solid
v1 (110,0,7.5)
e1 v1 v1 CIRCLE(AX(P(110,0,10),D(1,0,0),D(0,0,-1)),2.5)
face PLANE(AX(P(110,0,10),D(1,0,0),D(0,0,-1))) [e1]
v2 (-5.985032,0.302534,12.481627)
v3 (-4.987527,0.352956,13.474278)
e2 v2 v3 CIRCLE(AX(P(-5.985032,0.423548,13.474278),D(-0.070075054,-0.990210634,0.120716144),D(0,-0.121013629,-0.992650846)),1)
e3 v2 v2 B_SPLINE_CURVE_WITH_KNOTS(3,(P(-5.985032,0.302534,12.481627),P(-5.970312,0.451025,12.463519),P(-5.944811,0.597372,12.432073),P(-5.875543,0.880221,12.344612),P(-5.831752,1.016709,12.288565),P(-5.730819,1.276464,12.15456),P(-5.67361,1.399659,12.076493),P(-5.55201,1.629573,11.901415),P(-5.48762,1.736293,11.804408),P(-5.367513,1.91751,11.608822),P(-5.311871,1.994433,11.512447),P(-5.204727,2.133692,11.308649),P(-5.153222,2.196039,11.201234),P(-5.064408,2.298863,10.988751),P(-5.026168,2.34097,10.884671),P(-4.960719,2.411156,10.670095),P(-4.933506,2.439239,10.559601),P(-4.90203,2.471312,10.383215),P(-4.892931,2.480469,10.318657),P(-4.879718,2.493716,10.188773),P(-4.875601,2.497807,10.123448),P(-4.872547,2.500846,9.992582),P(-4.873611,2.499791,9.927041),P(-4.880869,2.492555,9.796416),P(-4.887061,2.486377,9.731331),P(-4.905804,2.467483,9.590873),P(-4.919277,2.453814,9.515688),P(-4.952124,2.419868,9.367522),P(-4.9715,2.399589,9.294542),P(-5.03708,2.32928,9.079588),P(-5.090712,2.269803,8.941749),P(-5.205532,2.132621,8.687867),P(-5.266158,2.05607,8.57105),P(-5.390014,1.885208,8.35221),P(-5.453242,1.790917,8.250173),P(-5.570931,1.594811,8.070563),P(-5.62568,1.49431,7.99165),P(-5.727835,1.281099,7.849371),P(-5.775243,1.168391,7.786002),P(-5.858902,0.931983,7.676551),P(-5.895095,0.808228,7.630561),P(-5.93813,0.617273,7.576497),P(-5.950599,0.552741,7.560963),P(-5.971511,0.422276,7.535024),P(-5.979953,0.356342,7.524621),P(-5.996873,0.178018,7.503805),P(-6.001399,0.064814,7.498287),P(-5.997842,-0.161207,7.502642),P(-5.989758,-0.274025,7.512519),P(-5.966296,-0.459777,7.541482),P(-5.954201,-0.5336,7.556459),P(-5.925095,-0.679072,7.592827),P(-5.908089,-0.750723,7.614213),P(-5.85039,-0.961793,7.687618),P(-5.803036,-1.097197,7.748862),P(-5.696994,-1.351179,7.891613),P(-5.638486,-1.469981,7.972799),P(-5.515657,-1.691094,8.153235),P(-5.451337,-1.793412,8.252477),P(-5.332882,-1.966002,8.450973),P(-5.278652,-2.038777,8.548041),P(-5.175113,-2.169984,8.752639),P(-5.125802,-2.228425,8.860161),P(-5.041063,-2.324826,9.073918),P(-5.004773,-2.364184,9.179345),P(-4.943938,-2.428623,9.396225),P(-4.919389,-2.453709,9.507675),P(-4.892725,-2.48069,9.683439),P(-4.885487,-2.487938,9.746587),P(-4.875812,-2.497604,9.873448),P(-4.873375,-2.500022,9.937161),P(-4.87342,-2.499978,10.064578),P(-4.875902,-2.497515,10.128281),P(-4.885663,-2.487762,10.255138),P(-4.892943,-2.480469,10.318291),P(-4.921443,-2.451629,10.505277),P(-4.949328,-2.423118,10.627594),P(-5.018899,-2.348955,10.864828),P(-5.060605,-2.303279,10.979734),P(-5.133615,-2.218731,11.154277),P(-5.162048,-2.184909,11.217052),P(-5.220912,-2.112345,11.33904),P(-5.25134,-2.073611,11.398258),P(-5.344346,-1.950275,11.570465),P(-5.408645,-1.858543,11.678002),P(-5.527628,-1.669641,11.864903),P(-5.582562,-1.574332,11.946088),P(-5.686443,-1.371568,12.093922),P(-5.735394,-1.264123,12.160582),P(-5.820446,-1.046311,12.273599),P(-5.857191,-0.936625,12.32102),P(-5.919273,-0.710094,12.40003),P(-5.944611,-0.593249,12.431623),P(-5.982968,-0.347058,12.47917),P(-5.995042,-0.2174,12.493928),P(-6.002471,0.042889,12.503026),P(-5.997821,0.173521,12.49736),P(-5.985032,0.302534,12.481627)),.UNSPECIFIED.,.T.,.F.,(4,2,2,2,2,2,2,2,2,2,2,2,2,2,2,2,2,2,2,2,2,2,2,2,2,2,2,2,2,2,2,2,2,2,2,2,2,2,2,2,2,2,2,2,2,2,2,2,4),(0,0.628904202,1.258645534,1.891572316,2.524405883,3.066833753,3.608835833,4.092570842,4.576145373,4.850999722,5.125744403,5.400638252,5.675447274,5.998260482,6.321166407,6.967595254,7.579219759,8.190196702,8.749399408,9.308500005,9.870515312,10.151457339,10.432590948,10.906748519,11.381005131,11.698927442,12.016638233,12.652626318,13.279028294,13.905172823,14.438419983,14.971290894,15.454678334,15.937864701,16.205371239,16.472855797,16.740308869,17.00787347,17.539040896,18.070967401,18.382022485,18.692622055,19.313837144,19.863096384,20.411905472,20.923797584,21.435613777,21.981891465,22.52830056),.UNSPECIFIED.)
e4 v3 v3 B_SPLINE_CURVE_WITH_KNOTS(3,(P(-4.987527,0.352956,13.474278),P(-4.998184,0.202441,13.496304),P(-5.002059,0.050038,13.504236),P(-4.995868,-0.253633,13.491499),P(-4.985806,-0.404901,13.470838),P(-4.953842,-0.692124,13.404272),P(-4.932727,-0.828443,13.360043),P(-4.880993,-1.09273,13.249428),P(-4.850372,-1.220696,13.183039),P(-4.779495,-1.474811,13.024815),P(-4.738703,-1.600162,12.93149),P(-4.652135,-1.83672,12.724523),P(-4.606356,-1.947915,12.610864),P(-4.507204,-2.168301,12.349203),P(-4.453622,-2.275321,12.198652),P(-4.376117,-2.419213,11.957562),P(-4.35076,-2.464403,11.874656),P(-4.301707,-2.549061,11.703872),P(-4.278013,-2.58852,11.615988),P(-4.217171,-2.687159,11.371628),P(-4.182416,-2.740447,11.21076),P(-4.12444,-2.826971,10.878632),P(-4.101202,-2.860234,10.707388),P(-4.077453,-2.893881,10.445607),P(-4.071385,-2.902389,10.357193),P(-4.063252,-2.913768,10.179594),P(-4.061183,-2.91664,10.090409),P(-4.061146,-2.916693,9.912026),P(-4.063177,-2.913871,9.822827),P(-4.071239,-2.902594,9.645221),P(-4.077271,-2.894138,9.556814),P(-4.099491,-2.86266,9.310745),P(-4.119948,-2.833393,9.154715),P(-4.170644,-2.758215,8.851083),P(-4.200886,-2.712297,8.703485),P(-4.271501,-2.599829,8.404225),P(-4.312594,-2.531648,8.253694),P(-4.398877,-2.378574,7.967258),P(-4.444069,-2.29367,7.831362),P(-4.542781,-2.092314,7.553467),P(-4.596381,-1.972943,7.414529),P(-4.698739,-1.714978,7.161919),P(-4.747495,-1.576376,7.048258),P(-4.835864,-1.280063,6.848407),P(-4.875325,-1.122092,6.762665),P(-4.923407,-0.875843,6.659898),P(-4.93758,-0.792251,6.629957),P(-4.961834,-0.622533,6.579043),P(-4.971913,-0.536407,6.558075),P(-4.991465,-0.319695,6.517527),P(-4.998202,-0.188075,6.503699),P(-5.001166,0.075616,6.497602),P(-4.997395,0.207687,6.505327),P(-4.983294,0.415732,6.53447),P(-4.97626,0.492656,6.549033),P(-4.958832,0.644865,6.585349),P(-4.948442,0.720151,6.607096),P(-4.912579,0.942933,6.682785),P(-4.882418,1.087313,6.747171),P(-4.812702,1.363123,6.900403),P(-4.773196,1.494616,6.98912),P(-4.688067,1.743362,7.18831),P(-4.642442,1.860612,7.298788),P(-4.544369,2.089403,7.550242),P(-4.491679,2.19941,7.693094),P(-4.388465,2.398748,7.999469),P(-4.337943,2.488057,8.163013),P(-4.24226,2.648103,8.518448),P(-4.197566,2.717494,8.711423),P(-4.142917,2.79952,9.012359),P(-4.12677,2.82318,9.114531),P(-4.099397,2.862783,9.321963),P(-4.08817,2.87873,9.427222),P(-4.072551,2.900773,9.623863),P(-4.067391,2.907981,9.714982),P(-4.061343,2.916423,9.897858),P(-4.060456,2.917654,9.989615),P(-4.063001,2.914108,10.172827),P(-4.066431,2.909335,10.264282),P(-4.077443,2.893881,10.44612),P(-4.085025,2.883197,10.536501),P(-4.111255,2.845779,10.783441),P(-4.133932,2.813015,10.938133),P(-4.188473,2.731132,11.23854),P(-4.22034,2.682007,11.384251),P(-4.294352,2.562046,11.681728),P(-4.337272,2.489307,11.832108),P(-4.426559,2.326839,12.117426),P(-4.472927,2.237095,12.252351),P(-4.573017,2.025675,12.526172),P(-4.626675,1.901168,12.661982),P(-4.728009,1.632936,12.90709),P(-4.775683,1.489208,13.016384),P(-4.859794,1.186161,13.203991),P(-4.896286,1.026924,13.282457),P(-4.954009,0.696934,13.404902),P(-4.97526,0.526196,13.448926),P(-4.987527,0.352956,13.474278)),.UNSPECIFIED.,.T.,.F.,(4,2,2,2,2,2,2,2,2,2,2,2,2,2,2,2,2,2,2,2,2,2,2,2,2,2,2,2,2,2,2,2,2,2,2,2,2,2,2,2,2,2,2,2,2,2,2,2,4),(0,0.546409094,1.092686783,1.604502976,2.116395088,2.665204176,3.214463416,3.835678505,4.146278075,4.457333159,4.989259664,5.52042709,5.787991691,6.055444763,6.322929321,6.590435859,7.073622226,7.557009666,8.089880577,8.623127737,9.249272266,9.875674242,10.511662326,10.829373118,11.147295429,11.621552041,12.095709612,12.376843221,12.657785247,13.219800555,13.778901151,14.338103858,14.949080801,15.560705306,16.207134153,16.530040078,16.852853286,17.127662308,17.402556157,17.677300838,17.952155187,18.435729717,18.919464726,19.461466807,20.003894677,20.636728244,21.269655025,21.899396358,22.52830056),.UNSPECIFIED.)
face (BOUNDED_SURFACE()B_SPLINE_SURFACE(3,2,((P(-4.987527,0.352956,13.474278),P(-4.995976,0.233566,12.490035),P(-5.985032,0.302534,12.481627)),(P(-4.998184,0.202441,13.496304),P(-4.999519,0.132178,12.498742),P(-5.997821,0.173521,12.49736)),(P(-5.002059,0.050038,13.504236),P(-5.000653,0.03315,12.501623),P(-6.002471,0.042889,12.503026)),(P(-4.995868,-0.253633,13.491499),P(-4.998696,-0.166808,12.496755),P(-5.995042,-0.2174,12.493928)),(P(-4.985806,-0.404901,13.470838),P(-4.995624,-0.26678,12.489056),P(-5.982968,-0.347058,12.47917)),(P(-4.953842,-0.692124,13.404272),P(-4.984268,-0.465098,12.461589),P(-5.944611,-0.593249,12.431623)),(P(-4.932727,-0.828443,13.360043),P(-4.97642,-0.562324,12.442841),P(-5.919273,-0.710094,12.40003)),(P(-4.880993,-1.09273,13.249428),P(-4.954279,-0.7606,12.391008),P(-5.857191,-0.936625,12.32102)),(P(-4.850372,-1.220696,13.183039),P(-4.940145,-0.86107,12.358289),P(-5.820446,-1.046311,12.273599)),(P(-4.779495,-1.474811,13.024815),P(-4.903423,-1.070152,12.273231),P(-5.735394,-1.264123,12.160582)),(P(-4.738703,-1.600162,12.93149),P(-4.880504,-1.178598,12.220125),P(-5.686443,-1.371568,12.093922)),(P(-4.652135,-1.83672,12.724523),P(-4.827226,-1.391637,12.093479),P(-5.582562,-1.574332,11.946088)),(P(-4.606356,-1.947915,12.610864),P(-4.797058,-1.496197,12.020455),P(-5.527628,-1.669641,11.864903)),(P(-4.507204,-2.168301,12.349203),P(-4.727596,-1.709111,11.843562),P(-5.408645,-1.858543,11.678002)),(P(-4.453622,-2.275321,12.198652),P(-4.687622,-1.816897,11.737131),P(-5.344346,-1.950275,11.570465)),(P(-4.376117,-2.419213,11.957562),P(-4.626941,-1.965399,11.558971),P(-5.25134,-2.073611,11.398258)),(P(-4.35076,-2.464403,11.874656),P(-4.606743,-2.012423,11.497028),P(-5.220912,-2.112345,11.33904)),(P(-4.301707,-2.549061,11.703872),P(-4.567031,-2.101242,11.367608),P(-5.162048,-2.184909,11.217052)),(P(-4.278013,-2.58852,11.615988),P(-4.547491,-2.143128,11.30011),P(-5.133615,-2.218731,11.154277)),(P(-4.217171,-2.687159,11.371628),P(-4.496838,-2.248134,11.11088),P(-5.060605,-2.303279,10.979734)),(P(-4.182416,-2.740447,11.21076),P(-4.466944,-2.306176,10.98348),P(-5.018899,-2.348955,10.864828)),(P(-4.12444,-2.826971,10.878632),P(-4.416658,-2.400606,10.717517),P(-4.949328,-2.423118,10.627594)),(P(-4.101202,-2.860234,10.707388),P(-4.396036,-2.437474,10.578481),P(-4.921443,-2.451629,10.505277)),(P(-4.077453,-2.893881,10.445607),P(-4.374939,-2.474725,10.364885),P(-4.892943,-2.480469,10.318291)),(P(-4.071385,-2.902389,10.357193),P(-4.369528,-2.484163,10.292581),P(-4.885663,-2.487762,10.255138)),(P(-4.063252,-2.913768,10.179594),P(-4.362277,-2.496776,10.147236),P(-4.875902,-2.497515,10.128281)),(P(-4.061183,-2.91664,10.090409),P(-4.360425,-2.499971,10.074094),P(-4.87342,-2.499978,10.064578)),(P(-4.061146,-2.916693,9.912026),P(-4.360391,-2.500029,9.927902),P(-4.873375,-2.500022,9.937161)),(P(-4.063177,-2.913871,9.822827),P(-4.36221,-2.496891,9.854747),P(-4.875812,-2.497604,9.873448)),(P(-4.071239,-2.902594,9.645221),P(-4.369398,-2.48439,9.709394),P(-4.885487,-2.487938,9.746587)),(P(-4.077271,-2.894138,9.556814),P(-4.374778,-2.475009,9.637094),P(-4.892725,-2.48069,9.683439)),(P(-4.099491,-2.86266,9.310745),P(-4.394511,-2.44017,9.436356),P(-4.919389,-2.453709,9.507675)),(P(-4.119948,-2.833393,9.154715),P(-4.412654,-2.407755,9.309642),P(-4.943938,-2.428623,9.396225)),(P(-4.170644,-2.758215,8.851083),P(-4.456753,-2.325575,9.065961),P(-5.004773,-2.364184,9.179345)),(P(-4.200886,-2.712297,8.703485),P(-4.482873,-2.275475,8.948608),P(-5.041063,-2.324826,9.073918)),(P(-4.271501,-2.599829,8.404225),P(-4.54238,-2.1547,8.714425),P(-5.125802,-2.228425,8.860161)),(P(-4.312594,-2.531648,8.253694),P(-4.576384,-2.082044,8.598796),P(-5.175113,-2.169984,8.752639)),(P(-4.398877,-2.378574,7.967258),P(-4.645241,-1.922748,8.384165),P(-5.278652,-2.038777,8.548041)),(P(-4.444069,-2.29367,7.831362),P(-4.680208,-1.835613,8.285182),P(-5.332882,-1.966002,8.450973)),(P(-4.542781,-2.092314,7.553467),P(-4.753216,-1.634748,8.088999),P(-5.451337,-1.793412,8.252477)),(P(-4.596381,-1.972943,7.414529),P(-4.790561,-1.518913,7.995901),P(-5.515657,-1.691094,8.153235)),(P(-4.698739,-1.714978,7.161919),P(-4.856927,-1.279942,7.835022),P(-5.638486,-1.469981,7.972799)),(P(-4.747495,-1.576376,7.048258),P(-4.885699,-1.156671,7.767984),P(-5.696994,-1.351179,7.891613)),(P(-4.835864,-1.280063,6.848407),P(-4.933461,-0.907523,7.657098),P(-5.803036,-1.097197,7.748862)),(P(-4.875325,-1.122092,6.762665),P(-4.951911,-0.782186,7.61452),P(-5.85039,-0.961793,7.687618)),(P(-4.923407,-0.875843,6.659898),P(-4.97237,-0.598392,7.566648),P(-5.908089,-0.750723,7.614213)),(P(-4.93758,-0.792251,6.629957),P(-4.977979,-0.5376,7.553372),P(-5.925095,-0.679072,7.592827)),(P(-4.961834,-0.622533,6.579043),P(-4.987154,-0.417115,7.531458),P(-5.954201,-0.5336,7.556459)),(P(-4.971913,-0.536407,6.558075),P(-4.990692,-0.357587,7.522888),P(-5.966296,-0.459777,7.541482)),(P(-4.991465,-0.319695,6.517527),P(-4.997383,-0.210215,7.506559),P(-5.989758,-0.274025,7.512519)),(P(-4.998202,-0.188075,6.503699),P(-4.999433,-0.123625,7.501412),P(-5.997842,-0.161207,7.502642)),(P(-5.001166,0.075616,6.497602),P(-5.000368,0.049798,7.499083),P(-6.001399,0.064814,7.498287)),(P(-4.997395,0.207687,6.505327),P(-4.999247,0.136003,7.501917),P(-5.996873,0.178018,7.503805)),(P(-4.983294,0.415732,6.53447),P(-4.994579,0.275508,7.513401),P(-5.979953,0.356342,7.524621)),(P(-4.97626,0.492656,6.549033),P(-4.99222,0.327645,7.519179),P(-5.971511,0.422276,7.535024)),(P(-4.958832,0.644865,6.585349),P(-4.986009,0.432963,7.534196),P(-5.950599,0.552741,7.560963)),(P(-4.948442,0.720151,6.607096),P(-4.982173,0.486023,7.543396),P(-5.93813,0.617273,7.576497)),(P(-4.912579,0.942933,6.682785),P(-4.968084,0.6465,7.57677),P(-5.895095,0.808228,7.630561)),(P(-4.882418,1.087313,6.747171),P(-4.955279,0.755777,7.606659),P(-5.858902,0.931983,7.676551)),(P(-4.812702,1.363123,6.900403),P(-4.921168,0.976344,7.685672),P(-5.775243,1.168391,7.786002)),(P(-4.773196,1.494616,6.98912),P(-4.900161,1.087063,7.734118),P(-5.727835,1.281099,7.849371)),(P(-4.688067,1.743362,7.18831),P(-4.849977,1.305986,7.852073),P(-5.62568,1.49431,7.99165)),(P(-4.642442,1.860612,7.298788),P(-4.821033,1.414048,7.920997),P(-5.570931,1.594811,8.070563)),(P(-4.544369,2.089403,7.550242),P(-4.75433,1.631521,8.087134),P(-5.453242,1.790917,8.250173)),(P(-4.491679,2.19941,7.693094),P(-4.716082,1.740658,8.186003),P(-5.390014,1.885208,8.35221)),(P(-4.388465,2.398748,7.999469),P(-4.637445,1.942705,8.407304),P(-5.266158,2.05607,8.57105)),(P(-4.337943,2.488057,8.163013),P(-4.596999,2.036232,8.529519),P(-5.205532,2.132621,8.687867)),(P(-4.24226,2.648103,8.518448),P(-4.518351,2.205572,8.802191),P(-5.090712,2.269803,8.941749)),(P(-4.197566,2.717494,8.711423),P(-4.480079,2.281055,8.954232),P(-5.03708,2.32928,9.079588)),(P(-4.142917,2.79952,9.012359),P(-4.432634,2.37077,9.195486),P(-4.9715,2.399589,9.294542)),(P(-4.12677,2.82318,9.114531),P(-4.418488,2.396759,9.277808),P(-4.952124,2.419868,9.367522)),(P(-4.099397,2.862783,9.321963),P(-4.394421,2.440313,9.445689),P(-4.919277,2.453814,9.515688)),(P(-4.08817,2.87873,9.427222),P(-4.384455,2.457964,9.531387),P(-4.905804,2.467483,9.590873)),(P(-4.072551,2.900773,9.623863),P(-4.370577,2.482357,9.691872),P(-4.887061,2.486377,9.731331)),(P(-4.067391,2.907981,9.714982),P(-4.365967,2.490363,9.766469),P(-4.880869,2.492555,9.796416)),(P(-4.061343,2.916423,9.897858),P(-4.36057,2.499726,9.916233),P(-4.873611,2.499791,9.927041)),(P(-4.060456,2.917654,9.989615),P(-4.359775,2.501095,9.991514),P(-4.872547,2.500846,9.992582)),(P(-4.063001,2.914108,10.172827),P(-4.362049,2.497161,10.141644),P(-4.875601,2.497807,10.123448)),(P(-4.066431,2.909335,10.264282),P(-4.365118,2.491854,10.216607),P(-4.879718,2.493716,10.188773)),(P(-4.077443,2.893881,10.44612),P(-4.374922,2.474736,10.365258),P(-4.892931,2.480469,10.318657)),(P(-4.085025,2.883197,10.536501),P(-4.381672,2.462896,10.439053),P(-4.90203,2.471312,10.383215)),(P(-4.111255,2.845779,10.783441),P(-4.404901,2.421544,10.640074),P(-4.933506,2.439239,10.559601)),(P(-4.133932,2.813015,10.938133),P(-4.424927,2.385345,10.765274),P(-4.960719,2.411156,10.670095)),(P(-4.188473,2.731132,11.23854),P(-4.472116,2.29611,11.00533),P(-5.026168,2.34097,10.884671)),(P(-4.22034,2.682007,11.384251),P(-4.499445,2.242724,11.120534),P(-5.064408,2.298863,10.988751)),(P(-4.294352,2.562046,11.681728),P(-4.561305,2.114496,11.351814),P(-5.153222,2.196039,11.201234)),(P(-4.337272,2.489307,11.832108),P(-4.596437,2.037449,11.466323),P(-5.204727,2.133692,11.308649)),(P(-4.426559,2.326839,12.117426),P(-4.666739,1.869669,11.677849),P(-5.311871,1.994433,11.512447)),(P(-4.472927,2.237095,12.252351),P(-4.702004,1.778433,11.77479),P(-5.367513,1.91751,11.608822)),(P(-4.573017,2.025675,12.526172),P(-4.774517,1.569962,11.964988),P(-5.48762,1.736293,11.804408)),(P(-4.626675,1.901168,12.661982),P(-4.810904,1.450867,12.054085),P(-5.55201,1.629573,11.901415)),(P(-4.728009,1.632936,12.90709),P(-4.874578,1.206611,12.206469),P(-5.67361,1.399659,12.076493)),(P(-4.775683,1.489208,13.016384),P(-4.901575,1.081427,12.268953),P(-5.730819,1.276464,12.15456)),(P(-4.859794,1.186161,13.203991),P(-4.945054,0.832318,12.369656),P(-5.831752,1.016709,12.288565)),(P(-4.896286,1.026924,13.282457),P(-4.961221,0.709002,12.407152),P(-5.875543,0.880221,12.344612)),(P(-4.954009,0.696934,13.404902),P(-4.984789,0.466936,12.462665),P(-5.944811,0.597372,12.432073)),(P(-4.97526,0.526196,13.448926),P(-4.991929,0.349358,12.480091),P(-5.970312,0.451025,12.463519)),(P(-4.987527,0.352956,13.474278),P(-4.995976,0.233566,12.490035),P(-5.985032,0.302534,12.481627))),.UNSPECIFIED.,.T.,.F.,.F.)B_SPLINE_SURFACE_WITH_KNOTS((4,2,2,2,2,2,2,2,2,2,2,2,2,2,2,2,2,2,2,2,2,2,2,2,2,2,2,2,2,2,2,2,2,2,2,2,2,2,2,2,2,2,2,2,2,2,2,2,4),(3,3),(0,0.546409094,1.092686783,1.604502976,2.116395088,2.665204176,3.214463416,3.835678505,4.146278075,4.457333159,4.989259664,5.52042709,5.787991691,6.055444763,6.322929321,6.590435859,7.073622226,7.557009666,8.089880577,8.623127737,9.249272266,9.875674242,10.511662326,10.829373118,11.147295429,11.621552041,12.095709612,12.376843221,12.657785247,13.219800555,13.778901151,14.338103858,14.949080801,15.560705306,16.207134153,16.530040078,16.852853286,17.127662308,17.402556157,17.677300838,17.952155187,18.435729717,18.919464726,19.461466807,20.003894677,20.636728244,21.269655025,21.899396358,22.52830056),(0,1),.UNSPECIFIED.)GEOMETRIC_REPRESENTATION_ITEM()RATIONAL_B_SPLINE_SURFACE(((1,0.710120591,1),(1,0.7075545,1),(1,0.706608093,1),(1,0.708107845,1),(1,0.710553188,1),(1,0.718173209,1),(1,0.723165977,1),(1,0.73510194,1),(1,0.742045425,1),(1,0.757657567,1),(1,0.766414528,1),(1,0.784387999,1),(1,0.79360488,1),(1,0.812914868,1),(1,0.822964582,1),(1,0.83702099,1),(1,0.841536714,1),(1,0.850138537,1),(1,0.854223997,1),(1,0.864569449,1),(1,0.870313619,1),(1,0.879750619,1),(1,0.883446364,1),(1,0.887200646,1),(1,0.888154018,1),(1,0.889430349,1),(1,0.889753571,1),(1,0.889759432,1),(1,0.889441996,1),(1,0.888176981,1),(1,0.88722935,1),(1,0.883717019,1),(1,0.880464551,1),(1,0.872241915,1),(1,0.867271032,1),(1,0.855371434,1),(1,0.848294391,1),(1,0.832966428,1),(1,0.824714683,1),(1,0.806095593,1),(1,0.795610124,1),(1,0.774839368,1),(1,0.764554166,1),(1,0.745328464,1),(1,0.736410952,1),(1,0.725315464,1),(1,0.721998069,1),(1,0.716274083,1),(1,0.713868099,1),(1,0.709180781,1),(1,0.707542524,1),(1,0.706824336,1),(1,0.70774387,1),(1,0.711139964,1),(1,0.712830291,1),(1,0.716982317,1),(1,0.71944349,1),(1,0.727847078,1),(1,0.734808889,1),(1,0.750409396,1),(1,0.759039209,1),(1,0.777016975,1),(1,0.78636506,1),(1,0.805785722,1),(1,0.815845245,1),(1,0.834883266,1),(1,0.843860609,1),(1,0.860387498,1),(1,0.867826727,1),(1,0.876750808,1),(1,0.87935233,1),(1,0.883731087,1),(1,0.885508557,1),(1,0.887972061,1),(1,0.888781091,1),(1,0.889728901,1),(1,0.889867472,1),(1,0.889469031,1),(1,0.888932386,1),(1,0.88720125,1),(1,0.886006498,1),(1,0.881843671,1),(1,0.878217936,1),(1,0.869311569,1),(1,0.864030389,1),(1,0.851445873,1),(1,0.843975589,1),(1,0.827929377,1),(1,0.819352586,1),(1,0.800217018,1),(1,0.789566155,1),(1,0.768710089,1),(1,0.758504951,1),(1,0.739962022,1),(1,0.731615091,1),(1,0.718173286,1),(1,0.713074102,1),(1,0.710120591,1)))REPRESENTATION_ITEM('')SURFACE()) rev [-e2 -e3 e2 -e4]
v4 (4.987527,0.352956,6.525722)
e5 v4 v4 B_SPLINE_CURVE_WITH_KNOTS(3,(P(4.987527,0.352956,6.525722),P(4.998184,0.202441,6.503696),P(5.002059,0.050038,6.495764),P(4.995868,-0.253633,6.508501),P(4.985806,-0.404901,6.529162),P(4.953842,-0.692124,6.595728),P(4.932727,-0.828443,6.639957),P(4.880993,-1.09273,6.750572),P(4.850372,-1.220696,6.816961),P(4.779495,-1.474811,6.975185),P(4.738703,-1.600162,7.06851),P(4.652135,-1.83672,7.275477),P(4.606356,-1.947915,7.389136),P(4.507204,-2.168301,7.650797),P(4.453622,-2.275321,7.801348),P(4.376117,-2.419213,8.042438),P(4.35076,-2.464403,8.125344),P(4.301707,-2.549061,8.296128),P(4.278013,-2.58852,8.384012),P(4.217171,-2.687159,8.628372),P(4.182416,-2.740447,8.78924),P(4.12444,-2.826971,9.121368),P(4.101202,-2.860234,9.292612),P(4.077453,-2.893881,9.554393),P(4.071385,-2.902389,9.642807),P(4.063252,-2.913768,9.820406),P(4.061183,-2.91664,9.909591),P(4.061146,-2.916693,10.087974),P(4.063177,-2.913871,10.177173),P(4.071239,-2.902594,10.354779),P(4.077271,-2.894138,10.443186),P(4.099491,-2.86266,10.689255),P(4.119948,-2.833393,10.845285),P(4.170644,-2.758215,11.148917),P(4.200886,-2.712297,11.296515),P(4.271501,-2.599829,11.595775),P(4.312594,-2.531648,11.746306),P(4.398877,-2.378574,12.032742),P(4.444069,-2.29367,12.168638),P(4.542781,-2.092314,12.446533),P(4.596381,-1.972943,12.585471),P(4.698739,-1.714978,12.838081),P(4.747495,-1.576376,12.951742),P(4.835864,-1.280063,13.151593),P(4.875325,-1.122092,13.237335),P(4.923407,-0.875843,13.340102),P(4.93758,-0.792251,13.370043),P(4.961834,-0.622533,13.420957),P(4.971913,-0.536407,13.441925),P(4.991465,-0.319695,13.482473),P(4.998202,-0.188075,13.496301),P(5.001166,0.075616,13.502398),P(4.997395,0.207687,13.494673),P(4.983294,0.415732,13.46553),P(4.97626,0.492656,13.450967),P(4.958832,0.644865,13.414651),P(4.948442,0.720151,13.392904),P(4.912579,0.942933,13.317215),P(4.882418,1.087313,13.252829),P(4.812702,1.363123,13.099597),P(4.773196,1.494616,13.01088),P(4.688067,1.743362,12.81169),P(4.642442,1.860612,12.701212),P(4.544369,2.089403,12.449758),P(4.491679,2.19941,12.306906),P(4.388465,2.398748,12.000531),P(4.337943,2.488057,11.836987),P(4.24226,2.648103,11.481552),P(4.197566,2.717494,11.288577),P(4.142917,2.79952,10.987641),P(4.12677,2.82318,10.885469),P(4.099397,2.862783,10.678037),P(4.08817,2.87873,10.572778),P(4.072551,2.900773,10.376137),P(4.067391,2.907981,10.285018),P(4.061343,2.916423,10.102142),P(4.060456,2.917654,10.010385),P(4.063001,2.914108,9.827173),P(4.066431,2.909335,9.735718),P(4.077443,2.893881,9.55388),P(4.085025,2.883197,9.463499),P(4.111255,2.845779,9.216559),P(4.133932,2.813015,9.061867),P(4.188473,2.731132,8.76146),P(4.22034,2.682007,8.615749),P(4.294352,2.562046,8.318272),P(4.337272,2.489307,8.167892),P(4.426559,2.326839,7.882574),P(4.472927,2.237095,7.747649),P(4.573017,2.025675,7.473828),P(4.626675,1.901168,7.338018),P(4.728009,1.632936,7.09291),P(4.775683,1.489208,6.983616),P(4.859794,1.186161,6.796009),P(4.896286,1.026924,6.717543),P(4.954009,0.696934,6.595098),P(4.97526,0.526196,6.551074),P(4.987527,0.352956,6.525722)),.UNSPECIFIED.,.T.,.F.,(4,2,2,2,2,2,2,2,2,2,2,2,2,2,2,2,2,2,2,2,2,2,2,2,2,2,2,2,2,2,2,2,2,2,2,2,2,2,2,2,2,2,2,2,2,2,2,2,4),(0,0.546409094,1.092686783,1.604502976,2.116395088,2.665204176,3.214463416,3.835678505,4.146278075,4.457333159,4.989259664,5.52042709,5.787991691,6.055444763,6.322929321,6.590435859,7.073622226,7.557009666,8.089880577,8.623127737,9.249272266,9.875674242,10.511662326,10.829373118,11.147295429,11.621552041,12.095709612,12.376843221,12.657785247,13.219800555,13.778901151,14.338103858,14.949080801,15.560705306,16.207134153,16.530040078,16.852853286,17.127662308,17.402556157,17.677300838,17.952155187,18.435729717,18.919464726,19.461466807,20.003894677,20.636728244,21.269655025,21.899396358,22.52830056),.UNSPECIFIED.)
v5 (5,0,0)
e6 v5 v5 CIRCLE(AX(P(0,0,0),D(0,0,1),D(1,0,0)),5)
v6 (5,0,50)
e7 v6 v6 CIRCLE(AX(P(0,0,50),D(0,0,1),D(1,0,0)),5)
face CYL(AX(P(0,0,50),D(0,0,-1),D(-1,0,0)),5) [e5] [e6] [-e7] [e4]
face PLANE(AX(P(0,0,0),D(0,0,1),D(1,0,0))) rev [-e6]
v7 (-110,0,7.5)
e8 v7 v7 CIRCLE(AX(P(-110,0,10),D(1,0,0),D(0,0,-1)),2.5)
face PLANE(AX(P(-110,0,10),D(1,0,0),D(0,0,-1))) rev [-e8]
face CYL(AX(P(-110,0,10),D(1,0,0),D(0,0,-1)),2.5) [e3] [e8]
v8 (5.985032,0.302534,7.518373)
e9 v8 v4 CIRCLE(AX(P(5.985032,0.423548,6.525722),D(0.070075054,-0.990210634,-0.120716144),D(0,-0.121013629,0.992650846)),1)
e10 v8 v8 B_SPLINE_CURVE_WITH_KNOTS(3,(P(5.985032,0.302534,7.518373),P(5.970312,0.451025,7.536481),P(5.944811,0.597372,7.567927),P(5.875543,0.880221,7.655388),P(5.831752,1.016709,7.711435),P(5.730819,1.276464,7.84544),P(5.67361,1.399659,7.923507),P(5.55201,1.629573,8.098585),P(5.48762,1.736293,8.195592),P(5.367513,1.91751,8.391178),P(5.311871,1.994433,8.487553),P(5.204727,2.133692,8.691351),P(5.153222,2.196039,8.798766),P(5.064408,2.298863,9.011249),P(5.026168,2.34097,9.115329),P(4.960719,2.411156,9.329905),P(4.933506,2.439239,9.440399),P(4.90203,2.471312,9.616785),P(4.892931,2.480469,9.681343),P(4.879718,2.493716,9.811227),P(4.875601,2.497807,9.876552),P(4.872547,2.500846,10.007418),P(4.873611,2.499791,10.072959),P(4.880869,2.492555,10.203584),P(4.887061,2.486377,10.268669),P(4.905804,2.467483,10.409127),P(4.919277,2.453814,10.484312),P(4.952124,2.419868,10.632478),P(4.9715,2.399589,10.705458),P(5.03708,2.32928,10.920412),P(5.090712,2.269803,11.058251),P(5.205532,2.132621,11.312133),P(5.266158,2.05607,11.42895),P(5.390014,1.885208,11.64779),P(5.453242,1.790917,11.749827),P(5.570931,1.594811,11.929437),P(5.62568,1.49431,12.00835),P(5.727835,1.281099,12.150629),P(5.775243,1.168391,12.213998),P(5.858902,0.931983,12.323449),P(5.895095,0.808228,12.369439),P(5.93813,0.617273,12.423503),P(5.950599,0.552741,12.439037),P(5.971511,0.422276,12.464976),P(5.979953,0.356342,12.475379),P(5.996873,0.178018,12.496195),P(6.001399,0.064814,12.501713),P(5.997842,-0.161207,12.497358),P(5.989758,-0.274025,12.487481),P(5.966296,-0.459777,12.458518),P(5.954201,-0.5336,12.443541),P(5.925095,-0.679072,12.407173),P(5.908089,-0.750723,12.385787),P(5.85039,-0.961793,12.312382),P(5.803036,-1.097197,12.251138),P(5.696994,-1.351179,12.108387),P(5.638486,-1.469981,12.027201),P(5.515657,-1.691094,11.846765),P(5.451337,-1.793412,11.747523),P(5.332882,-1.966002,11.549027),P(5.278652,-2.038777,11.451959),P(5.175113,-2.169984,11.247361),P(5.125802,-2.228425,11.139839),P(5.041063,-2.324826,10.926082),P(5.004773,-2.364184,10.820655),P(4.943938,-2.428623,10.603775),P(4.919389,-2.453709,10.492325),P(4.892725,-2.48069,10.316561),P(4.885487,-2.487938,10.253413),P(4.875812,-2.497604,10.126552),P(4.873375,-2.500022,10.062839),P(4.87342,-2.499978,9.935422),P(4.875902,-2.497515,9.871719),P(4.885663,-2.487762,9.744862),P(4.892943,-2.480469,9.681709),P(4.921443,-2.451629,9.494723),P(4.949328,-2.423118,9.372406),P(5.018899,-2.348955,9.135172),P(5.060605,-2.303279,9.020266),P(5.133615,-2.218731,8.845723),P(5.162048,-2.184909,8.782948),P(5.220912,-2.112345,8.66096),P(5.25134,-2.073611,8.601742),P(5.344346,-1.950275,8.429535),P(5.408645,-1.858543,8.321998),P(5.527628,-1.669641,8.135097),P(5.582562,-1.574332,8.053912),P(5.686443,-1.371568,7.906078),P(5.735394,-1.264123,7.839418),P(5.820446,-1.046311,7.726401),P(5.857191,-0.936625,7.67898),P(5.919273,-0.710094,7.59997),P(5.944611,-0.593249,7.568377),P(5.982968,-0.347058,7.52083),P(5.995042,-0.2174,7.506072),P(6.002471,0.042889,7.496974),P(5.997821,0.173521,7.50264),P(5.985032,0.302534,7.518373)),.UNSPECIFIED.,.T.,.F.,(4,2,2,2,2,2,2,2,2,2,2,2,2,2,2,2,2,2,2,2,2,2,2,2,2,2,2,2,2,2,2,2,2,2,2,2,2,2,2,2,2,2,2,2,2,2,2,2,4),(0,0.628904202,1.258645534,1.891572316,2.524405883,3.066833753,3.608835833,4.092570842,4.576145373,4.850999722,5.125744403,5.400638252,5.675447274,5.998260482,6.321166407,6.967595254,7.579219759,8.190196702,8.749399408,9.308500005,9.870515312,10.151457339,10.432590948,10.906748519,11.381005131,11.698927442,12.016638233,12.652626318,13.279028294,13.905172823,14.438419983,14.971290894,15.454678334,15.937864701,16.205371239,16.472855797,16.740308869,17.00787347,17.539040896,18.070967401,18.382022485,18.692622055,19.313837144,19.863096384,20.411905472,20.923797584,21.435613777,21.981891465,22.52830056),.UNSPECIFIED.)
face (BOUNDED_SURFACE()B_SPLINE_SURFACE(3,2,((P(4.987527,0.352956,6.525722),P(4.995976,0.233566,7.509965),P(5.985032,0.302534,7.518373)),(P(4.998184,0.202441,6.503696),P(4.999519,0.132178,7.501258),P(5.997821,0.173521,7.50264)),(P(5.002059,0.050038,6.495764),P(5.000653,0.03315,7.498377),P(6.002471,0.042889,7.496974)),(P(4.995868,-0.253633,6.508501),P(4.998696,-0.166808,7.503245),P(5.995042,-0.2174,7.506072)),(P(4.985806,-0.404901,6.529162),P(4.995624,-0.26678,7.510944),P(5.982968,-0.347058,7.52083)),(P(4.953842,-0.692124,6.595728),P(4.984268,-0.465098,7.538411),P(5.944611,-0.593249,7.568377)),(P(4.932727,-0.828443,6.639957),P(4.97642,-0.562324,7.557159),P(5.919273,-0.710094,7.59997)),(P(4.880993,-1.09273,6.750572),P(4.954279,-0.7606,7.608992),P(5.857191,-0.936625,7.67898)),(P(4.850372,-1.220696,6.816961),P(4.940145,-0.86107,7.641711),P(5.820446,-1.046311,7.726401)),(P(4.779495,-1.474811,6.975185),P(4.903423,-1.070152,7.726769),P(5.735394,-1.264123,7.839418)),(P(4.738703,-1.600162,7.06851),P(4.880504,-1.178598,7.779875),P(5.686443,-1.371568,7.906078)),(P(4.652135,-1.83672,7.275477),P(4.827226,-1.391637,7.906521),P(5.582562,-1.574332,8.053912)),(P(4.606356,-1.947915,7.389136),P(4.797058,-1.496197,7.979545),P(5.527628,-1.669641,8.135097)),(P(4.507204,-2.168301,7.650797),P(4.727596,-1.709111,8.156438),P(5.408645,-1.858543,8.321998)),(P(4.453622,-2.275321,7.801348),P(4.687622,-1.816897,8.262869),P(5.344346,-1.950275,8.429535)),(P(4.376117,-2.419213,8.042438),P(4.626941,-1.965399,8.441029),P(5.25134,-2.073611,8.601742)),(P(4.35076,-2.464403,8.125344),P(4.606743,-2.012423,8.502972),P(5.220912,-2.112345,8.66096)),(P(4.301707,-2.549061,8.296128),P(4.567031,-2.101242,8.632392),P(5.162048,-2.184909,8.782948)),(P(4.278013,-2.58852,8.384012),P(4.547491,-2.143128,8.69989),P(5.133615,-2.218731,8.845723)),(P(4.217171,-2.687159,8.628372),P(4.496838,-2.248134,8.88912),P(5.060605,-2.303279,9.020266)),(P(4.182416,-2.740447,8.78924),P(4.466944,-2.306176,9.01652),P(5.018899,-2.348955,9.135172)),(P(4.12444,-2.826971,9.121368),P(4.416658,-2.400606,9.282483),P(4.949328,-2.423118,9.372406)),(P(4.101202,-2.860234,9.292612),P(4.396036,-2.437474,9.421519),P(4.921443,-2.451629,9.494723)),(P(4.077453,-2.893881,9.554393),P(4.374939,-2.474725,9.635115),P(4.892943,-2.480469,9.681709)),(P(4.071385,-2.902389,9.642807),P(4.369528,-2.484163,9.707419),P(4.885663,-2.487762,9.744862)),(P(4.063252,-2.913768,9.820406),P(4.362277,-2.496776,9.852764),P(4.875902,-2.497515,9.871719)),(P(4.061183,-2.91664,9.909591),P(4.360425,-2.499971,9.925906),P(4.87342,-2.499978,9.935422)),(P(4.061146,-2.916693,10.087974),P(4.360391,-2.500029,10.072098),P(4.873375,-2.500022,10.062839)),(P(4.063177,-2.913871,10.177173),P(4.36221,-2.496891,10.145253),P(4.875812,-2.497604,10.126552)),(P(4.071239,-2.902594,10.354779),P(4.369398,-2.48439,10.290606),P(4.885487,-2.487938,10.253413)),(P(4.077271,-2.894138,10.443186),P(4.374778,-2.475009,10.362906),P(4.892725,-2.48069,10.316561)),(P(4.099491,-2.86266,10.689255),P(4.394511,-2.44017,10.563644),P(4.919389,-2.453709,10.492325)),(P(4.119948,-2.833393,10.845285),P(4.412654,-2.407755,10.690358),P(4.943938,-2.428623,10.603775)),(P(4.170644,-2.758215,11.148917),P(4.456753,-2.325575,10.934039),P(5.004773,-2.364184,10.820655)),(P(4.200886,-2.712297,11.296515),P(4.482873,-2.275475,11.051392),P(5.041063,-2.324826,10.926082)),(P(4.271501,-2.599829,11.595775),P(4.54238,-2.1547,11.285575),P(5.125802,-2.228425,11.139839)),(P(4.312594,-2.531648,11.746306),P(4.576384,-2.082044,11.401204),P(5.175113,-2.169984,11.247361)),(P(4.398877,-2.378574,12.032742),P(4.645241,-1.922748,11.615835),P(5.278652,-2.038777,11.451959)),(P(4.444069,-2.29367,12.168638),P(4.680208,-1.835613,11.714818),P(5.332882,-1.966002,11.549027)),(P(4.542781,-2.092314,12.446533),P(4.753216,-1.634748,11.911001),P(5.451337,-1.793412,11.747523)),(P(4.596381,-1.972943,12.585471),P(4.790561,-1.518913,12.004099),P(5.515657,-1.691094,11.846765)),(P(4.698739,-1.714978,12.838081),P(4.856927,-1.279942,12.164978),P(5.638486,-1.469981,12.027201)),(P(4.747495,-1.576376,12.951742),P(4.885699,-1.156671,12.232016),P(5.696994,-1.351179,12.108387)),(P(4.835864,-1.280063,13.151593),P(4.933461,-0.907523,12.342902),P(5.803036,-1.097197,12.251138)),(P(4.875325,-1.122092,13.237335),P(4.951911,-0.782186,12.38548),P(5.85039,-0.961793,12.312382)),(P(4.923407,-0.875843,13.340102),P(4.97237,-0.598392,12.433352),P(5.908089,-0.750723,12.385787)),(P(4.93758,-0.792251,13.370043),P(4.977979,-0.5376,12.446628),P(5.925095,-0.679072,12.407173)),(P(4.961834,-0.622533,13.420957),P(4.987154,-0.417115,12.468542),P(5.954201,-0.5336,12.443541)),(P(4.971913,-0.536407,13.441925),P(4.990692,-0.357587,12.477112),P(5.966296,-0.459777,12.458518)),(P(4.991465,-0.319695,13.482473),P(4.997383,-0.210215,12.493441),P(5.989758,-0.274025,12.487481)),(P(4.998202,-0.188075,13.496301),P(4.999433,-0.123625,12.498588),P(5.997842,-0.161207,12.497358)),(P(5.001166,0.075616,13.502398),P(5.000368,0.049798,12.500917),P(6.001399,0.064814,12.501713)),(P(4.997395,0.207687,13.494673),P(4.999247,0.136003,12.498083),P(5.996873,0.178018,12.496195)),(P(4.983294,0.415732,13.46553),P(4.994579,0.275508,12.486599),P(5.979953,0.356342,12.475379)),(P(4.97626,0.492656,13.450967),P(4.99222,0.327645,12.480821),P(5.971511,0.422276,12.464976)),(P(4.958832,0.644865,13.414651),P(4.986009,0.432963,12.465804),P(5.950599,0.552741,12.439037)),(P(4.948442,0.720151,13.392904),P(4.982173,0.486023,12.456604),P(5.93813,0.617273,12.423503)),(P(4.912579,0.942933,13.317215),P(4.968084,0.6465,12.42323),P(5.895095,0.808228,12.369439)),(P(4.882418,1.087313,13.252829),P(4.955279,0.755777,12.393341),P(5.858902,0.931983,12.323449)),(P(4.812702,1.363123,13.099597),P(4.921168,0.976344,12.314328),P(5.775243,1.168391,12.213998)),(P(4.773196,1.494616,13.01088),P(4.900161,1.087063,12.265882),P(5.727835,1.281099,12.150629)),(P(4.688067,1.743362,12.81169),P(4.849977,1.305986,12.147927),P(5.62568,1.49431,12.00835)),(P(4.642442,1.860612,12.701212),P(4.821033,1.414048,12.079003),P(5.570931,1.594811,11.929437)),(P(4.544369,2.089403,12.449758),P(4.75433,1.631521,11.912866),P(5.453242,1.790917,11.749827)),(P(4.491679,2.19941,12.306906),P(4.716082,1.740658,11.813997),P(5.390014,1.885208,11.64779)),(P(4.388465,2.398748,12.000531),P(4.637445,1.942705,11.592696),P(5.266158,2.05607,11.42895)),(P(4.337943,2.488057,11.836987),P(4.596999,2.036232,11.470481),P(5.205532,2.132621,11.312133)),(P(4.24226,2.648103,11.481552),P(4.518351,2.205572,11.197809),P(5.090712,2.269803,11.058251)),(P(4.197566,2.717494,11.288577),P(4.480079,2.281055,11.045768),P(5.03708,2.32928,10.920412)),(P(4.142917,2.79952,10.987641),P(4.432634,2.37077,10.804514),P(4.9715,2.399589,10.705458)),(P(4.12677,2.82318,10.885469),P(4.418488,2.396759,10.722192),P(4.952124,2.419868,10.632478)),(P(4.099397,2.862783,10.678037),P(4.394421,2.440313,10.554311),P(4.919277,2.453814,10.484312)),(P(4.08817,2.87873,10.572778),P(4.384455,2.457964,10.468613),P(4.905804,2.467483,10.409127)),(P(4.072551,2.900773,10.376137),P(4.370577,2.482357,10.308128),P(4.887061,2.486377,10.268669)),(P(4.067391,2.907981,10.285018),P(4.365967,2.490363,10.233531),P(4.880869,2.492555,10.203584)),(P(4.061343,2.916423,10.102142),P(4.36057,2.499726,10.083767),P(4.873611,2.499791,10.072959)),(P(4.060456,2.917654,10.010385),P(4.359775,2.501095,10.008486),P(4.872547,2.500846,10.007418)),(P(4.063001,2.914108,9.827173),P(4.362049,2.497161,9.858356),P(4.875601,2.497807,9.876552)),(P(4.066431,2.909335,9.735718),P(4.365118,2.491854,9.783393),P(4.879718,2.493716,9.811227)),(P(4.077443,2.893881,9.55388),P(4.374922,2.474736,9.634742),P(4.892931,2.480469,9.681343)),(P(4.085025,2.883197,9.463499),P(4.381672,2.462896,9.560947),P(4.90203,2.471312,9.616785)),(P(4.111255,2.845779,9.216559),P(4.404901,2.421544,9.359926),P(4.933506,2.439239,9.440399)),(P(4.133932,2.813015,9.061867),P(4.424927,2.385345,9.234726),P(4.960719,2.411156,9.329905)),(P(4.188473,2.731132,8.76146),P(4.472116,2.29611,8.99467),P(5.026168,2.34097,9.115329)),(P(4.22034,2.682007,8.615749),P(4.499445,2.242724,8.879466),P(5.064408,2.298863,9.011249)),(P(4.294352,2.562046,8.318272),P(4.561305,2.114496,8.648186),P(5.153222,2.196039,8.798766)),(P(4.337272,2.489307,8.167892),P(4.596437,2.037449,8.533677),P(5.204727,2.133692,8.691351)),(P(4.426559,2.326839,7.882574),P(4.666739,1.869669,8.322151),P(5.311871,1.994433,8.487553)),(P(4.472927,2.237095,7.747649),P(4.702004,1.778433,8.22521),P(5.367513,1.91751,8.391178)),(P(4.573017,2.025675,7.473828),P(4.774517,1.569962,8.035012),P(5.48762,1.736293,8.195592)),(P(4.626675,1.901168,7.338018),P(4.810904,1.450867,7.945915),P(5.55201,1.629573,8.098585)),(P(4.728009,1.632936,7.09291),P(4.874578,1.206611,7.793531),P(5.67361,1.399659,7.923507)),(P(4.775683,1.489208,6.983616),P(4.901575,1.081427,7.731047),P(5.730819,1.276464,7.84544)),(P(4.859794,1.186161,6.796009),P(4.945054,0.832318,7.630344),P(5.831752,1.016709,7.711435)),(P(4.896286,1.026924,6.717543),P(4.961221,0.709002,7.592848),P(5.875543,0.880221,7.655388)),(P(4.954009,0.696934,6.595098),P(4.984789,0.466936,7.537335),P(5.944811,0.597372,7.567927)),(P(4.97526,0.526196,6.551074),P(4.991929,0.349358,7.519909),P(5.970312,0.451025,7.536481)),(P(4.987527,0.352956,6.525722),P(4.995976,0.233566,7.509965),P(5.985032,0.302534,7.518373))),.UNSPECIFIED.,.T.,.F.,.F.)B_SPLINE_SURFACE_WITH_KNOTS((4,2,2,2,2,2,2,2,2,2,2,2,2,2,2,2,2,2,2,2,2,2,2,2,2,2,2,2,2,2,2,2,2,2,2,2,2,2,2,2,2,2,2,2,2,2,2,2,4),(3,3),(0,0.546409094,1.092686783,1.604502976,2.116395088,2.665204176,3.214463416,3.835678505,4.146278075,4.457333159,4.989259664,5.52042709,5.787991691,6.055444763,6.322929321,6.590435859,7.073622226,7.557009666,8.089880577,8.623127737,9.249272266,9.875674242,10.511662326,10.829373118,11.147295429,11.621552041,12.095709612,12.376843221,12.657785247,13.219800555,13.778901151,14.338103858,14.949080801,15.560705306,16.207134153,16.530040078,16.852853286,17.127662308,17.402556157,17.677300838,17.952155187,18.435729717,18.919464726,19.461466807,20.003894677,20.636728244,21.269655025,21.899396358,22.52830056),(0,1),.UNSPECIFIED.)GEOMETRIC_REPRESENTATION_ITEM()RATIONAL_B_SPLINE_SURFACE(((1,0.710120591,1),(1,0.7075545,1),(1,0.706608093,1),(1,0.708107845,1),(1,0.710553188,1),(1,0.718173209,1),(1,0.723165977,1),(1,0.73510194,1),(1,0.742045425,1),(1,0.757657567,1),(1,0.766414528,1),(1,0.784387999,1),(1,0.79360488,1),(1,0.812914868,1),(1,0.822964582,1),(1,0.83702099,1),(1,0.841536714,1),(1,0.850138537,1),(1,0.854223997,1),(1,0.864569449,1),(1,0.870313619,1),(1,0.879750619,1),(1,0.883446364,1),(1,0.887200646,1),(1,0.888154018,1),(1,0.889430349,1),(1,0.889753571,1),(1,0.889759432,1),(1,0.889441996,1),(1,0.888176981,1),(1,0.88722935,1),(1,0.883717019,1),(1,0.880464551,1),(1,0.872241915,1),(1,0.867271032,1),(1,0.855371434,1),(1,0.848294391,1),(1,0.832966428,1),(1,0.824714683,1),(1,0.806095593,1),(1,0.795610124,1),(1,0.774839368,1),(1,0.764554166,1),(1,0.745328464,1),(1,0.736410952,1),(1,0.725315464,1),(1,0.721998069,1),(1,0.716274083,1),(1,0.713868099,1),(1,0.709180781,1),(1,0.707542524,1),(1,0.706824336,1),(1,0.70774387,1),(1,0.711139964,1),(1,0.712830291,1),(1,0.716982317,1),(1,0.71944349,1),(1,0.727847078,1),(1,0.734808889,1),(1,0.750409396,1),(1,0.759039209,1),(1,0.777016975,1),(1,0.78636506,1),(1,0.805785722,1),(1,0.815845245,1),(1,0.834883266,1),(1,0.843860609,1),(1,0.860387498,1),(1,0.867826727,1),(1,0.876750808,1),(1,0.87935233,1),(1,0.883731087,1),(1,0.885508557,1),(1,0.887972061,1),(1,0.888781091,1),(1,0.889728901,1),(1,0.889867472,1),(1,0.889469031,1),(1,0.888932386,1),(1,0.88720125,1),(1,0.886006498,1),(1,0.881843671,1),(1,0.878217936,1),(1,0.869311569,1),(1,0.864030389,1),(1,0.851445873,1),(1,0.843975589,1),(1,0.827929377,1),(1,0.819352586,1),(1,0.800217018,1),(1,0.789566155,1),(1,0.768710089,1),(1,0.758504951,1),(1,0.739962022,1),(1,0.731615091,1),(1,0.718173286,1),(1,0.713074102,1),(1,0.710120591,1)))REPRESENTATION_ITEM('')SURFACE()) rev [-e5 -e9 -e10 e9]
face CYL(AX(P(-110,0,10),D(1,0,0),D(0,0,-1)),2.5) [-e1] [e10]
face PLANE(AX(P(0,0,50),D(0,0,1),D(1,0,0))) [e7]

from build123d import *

# Parameters (mm, degrees)
SKETCH1_R                = 5
BOSS_EXTRUDE1_DEPTH      = 50
BOSS_EXTRUDE2_DEPTH      = 110
BOSS_EXTRUDE2_DEPTH_BACK = 110
SKETCH2_R                = 2.5
FILLET1_R                = 1


with BuildPart() as part:
    # Sketch1 → Boss-Extrude1 (new body)
    with BuildSketch(Plane.XY):
        Circle(SKETCH1_R)
    extrude(amount=BOSS_EXTRUDE1_DEPTH)

    # Sketch2 → Boss-Extrude2 (add, two sides: drawn at the far end of the back side and taken through both)
    with BuildSketch(Plane(origin=(0, 0, 0), x_dir=(0, 0, -1), z_dir=(1, 0, 0)).offset(-BOSS_EXTRUDE2_DEPTH_BACK)):
        with Locations((-10, 0)):
            Circle(SKETCH2_R)
    extrude(amount=BOSS_EXTRUDE2_DEPTH + BOSS_EXTRUDE2_DEPTH_BACK)

    # Fillet1
    fillet1_edges = [part.edges().sort_by_distance(p)[0] for p in [
        (-4.999960513, -0.019871133, 12.499921026),
        (4.330127047, 2.499999952, 10.000491239),
    ]]
    fillet(fillet1_edges, radius=FILLET1_R - 0.0001)  # a hair under: the kernel refuses the full size


solid = part.part
